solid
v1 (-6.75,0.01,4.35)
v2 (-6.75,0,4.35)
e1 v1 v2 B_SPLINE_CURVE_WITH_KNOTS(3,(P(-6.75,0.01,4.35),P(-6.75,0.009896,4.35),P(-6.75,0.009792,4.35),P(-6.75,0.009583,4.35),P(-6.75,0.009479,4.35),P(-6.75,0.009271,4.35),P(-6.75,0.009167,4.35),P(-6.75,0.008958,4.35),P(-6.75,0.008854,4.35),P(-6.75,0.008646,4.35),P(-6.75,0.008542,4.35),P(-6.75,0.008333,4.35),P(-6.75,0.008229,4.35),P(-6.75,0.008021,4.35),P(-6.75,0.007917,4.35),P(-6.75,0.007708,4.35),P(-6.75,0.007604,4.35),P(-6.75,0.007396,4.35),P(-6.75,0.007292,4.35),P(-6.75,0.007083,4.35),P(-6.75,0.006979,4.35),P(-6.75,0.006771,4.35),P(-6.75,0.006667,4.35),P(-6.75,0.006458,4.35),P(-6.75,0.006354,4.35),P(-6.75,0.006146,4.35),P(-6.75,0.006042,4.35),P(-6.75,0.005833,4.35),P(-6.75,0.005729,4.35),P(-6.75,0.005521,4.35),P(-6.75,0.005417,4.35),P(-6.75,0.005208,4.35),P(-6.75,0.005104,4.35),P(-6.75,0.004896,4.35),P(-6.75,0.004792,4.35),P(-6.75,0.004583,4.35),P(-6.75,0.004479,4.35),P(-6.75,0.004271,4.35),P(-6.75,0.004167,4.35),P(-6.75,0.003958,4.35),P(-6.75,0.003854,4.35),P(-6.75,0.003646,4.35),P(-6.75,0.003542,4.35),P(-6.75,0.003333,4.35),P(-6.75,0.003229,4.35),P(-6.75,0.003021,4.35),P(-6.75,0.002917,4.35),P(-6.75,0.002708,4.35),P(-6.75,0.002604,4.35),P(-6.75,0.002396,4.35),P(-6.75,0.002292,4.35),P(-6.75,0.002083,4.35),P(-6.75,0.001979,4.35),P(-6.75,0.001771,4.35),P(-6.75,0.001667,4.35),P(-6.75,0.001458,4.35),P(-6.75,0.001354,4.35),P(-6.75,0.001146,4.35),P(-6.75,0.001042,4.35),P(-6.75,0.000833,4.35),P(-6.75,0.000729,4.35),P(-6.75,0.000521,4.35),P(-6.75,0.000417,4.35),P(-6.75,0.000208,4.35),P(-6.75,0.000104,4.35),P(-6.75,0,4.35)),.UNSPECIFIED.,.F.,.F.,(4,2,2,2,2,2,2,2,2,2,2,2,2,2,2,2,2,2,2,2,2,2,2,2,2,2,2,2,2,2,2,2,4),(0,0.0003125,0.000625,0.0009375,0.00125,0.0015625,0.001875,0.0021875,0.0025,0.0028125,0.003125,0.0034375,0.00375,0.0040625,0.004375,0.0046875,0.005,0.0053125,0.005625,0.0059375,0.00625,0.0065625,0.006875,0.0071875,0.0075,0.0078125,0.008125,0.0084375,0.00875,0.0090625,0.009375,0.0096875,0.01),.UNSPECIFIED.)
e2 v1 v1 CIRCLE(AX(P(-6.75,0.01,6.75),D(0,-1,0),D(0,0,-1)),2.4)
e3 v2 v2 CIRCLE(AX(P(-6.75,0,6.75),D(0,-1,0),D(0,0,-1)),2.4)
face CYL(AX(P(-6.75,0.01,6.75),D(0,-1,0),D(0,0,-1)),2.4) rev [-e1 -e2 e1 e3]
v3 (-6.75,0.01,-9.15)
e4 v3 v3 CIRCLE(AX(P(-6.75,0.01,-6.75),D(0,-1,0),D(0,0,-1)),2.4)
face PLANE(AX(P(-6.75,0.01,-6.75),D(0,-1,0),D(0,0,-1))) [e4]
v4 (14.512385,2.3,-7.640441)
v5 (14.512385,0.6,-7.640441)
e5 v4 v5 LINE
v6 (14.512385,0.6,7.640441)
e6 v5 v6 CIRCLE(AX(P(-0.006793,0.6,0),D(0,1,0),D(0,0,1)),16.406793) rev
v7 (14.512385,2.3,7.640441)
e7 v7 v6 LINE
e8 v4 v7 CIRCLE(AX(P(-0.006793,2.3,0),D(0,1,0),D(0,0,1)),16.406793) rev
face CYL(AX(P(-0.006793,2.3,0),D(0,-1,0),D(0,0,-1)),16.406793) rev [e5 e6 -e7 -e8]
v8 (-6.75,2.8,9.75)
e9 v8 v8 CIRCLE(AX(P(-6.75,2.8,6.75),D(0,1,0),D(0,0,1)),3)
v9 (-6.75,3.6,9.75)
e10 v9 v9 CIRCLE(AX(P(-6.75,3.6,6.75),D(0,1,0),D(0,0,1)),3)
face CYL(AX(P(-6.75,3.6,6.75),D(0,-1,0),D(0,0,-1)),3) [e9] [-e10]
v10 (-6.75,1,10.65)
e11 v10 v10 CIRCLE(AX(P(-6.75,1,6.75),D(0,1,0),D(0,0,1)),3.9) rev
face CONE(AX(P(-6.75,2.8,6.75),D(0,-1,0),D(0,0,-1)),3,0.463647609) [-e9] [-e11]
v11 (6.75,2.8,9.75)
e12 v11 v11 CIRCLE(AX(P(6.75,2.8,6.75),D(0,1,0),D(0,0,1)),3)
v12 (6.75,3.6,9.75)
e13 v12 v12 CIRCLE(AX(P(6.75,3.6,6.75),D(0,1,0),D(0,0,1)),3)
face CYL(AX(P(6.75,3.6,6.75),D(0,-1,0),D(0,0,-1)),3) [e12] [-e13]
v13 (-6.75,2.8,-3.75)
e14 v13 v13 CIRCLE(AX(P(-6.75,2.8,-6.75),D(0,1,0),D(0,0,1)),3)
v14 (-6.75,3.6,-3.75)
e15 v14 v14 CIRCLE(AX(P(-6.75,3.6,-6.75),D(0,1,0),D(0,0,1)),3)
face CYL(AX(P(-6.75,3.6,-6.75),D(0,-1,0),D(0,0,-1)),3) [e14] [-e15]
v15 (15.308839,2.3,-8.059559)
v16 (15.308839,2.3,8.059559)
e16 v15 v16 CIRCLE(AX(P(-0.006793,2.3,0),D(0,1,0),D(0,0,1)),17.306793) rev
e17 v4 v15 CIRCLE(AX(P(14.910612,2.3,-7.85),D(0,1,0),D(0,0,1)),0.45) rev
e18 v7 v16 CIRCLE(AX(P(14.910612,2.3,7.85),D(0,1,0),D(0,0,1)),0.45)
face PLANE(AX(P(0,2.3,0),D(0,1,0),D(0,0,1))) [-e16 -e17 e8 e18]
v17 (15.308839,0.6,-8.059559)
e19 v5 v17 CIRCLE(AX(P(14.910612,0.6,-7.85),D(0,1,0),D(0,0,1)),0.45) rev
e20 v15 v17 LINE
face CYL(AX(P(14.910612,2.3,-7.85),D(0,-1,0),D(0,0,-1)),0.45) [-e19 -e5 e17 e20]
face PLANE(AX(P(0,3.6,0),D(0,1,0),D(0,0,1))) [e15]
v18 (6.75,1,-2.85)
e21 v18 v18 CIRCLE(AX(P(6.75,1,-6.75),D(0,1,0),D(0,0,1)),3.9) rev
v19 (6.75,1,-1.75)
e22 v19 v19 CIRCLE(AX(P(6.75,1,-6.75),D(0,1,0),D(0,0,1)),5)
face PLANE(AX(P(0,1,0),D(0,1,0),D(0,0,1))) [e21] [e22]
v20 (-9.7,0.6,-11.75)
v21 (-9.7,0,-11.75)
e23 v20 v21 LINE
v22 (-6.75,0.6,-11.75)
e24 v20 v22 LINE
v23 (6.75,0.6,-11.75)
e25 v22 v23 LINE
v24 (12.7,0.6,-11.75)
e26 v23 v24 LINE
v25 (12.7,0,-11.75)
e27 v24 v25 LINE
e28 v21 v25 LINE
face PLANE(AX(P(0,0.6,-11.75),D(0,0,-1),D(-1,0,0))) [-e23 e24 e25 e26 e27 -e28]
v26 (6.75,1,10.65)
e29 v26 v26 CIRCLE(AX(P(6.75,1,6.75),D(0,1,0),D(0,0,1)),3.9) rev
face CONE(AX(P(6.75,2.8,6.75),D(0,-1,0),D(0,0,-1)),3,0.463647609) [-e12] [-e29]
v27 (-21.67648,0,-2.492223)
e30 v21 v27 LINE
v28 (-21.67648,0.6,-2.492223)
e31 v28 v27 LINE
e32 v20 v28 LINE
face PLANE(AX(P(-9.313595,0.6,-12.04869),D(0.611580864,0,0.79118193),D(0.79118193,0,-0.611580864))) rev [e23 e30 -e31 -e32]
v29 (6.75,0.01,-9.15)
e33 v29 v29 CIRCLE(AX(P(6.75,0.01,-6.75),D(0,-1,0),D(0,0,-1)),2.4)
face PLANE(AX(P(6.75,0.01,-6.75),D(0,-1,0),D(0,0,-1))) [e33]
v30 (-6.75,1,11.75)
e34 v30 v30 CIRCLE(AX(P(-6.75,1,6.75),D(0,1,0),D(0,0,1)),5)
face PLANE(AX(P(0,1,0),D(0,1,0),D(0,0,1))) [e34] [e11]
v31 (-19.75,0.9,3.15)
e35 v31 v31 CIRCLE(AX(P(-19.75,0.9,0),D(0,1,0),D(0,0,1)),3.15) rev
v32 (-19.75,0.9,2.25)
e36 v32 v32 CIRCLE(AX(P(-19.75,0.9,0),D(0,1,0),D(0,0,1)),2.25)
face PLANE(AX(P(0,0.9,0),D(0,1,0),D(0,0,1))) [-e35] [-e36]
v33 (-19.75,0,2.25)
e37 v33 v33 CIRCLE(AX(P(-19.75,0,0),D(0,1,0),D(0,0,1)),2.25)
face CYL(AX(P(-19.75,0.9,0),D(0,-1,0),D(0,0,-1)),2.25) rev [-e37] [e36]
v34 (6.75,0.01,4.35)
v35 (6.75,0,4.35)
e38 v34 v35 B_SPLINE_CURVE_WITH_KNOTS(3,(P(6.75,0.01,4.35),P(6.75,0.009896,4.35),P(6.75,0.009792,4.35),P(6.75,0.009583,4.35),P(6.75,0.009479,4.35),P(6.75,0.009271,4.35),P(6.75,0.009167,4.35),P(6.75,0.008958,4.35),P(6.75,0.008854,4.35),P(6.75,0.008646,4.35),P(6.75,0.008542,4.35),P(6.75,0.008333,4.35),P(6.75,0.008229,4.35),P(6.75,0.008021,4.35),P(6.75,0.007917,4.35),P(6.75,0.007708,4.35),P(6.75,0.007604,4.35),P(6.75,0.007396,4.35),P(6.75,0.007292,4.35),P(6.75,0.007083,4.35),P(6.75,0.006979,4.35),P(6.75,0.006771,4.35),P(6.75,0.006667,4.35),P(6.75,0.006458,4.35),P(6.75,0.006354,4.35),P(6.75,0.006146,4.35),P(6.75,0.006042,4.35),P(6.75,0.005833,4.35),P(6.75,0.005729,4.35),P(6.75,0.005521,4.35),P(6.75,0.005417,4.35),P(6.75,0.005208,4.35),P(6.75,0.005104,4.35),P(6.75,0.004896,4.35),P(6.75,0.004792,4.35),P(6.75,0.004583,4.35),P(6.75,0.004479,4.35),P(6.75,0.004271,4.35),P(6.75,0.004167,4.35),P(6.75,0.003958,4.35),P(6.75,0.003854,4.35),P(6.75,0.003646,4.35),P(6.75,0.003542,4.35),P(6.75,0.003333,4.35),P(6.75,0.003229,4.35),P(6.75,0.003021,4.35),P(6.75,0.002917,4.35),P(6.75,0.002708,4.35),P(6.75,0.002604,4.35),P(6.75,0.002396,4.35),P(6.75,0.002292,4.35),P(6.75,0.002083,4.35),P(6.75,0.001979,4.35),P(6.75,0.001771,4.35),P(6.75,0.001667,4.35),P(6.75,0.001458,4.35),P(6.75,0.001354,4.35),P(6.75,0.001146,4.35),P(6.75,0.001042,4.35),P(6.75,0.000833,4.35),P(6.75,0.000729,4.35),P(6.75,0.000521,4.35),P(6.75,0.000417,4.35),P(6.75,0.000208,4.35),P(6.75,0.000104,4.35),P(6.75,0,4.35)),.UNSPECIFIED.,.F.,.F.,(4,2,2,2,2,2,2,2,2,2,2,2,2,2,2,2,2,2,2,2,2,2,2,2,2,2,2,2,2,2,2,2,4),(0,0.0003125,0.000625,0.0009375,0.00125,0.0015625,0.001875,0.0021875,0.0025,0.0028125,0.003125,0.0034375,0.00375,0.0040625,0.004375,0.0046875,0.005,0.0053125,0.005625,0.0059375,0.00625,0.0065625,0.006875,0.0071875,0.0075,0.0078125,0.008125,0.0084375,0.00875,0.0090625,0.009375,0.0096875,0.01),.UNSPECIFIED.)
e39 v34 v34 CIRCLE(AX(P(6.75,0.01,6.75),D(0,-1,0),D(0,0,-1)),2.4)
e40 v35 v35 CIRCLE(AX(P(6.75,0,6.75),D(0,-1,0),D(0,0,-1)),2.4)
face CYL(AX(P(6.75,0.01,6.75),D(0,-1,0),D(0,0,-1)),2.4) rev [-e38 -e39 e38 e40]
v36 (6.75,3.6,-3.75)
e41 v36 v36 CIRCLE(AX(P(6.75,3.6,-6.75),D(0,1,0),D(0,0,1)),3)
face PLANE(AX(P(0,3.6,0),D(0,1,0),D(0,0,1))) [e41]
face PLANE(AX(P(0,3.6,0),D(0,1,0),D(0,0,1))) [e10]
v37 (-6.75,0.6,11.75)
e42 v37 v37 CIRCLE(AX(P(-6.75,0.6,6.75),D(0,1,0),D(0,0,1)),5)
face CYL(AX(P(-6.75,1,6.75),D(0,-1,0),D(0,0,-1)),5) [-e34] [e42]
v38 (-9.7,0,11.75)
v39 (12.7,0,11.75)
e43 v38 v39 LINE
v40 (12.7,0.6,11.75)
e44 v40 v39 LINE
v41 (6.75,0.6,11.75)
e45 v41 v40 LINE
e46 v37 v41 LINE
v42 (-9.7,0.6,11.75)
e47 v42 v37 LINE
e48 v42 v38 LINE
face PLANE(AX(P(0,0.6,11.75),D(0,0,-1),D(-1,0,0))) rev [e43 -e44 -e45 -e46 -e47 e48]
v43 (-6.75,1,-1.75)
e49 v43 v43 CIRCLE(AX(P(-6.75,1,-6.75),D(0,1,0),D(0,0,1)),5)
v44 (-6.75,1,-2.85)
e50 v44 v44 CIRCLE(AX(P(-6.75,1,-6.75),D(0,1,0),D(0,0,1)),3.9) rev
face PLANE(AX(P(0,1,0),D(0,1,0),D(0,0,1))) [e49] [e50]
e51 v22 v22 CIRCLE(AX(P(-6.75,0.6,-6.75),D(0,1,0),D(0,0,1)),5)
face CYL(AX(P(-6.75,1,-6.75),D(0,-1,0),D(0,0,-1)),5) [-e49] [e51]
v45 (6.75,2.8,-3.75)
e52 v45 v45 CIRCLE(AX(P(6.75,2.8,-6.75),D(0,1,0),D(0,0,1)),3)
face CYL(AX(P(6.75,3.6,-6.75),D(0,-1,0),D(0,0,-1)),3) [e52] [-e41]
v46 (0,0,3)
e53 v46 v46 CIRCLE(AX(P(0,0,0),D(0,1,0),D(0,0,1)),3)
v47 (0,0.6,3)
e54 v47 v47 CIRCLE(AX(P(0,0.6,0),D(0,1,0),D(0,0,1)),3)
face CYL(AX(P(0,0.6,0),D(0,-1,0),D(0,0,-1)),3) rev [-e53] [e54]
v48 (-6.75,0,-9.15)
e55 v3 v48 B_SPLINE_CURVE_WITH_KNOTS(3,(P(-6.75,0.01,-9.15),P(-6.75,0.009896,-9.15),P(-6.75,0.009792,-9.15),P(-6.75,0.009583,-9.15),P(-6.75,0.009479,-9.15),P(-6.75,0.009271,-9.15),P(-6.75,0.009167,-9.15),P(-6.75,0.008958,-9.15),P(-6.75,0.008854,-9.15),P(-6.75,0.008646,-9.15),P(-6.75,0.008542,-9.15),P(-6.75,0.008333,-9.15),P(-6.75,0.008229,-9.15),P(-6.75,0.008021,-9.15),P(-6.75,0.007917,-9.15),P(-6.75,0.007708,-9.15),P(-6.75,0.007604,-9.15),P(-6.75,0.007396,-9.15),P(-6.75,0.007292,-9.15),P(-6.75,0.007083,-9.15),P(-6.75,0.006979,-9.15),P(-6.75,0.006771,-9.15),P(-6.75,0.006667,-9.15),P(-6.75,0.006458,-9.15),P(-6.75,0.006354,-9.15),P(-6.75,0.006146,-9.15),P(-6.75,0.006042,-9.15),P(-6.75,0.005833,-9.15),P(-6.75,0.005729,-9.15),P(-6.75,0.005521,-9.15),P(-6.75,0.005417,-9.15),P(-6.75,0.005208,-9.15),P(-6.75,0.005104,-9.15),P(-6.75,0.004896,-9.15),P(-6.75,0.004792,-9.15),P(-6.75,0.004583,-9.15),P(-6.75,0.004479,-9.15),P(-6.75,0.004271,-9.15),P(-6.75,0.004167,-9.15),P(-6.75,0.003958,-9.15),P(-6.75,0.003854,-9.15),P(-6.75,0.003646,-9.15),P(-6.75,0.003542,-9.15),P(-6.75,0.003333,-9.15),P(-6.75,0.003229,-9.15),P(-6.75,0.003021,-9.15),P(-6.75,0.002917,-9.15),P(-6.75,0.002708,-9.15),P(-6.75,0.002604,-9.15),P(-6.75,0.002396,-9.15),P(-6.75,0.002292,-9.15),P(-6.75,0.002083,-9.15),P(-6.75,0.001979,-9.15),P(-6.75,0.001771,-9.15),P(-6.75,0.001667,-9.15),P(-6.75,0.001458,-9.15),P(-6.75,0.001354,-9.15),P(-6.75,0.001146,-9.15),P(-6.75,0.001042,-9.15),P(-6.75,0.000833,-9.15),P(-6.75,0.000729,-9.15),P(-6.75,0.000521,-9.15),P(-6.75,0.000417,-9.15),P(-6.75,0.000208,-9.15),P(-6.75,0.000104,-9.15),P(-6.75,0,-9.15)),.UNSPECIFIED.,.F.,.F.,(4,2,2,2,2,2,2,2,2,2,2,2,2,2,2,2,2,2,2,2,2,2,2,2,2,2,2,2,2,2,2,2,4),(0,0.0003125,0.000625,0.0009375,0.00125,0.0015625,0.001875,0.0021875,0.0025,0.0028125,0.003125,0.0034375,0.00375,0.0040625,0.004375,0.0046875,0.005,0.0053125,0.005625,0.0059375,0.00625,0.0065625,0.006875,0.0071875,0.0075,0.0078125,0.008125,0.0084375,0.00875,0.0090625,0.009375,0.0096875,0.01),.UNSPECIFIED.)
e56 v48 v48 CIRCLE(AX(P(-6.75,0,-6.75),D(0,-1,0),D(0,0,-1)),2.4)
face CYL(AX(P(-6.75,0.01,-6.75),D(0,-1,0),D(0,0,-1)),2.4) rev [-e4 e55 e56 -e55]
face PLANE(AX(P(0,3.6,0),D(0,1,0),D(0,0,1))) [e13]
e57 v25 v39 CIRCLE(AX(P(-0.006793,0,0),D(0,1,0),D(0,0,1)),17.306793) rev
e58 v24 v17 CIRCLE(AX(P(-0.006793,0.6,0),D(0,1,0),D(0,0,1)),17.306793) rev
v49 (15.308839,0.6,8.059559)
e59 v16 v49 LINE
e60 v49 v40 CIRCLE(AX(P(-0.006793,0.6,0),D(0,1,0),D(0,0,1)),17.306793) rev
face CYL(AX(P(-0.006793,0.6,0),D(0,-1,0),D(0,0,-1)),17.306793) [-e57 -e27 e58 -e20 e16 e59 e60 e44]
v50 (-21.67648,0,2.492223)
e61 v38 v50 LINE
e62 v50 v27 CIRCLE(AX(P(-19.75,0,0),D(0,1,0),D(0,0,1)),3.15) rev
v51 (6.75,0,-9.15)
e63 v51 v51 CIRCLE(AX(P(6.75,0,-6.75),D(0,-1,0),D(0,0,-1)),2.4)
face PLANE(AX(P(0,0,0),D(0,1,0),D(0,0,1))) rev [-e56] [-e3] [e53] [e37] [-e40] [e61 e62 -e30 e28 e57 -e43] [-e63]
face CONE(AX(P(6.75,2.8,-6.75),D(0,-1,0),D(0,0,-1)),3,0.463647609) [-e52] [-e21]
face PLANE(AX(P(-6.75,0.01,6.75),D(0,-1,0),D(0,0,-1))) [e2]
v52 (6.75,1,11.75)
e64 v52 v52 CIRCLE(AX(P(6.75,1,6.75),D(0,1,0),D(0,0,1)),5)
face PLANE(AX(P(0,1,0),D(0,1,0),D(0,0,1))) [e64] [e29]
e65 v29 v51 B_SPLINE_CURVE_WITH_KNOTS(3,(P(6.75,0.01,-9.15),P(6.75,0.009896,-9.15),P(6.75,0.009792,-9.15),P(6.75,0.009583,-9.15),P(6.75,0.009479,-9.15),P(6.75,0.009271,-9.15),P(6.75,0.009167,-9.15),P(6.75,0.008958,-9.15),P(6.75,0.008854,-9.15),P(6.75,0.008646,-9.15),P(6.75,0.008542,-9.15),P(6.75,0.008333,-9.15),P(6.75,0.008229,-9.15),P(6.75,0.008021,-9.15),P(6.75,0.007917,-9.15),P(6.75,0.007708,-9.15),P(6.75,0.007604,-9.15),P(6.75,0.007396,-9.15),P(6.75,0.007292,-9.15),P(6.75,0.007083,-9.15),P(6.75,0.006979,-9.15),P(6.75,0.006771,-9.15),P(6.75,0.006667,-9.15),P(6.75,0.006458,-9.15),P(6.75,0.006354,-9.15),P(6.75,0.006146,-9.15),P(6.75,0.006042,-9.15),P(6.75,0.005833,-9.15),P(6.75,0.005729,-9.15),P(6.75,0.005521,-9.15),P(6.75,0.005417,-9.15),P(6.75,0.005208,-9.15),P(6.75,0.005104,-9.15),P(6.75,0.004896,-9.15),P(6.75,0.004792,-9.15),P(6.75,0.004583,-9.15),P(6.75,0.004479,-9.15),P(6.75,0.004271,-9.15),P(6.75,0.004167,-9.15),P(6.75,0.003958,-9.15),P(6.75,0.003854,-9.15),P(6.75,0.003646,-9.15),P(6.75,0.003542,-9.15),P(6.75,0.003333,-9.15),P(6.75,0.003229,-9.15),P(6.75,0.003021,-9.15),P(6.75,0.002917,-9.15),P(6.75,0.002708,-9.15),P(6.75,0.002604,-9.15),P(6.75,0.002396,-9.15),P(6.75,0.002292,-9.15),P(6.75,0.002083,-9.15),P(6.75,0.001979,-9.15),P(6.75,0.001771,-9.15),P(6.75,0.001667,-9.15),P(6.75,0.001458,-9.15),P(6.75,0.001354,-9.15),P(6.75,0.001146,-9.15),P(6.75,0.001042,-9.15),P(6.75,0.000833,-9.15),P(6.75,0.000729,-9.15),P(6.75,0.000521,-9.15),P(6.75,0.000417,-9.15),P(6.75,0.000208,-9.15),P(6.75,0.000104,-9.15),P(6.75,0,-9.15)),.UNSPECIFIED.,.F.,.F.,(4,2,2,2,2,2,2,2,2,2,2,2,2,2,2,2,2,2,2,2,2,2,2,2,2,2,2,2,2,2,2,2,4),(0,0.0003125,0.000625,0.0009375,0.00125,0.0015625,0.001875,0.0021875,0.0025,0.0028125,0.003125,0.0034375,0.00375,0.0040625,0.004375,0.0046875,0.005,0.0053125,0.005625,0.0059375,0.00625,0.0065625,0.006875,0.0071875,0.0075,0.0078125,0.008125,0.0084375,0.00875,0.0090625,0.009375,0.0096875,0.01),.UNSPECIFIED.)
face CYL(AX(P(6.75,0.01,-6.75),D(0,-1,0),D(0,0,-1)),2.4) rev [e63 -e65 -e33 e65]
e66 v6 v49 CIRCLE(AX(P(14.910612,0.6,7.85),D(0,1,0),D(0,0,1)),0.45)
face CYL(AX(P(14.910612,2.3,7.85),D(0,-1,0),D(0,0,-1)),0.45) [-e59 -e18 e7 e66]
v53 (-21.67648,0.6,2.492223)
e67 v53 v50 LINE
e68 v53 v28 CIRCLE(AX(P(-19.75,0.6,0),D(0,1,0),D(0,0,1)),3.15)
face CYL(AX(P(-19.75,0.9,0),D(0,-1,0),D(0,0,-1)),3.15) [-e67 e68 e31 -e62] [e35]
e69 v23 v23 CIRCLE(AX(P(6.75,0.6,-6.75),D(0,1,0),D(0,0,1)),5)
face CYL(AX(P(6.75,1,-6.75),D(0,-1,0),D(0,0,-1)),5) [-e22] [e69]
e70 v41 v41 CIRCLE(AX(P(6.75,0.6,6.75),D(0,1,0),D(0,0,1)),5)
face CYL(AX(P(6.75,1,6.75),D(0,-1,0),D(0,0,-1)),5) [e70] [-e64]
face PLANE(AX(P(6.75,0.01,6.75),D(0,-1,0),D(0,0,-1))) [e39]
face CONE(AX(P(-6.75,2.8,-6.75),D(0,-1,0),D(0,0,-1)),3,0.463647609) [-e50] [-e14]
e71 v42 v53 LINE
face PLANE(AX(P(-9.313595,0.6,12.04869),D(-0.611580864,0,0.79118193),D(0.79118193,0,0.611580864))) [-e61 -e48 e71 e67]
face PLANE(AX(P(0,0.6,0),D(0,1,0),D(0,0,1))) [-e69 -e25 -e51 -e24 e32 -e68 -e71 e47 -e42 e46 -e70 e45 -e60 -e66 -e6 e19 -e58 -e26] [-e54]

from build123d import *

# Parameters (mm, degrees)
ESQUISSE1_R             = 3
SUPPORT_DEPTH           = 0.6
ESQUISSE1_4_R           = 2.25
FIXATION_DEPTH          = 0.9
LANGUETTE_DEPTH         = 2.3
ESQUISSE2_R             = 5
ESQUISSE2_R_2           = 4
SEMELLE_DEPTH           = 0.4
ESQUISSE2_4_R           = 3
BOUTONS_DEPTH           = 3
ESQUISSE2_5_R           = 4
ESQUISSE2_5_R_2         = 3
BORDURE_DEPTH           = 2.2
CHANFREIN_SIZE          = 2
CHANFREIN_SIZE_2        = 1
ESQUISSE3_R             = 2.4
ENL_V_MAT_EXTRU_1_DEPTH = 0.01


with BuildPart() as part:
    # Esquisse1 → Support (new body)
    with BuildSketch(Plane(origin=(0, 0, 0), x_dir=(1, 0, 0), z_dir=(0, 1, 0))):
        with BuildLine():
            Line((12.7, 11.75), (-9.7, 11.75))
            Line((-9.7, 11.75), (-21.676479721, 2.492223081))
            ThreePointArc((-21.676479721, 2.492223081), (-18.361819738, 2.82762366), (-16.6, 0))
            ThreePointArc((-16.6, 0), (-18.361819738, -2.82762366), (-21.676479721, -2.492223081))
            Line((-21.676479721, -2.492223081), (-9.7, -11.75))
            Line((-9.7, -11.75), (12.7, -11.75))
            ThreePointArc((12.7, -11.75), (14.125401288, -9.990303879), (15.308839134, -8.059559428))
            ThreePointArc((15.308839134, -8.059559428), (14.701052578, -8.248227129), (14.512384877, -7.640440572))
            ThreePointArc((14.512384877, -7.640440572), (16.4, 0), (14.512384877, 7.640440572))
            ThreePointArc((14.512384877, 7.640440572), (14.701052578, 8.248227129), (15.308839134, 8.059559428))
            ThreePointArc((15.308839134, 8.059559428), (14.125401288, 9.990303879), (12.7, 11.75))
        make_face()
        with Locations(Location((0, 0, 0), (0, 0, 270))):
            Circle(ESQUISSE1_R, mode=Mode.SUBTRACT)
    extrude(amount=SUPPORT_DEPTH)

    # Esquisse1<4> → Fixation (add)
    with BuildSketch(Plane(origin=(0, 0, 0), x_dir=(1, 0, 0), z_dir=(0, 1, 0))):
        with BuildLine():
            ThreePointArc((-16.6, 0), (-18.361819738, 2.82762366), (-21.676479721, 2.492223081))
            ThreePointArc((-21.676479721, 2.492223081), (-22.9, 0), (-21.676479721, -2.492223081))
            ThreePointArc((-21.676479721, -2.492223081), (-18.361819738, -2.82762366), (-16.6, 0))
        make_face()
        with Locations(Location((-19.75, 0, 0), (0, 0, 270))):
            Circle(ESQUISSE1_4_R, mode=Mode.SUBTRACT)
    extrude(amount=FIXATION_DEPTH)

    # Esquisse1<5> → Languette (add)
    with BuildSketch(Plane(origin=(0, 0, 0), x_dir=(1, 0, 0), z_dir=(0, 1, 0))):
        with BuildLine():
            ThreePointArc((15.308839134, -8.059559428), (17.3, 0), (15.308839134, 8.059559428))
            ThreePointArc((15.308839134, 8.059559428), (14.701052578, 8.248227129), (14.512384877, 7.640440572))
            ThreePointArc((14.512384877, 7.640440572), (16.4, 0), (14.512384877, -7.640440572))
            ThreePointArc((14.512384877, -7.640440572), (14.701052578, -8.248227129), (15.308839134, -8.059559428))
        make_face()
    extrude(amount=LANGUETTE_DEPTH)

    # Esquisse2 → Semelle (add)
    # profile 1 of 4: a face of its own
    with BuildSketch(Plane(origin=(0, 0.6, 0), x_dir=(1, 0, 0), z_dir=(0, 1, 0))):
        with Locations(Location((-6.75, 6.75, 0), (0, 0, 90))):
            Circle(ESQUISSE2_R)
        with Locations(Location((-6.75, 6.75, 0), (0, 0, 270))):
            Circle(ESQUISSE2_R_2, mode=Mode.SUBTRACT)
    # profile 2 of 4: a face of its own
    with BuildSketch(Plane(origin=(0, 0.6, 0), x_dir=(1, 0, 0), z_dir=(0, 1, 0))):
        with Locations(Location((6.75, 6.75, 0), (0, 0, 90))):
            Circle(ESQUISSE2_R)
        with Locations(Location((6.75, 6.75, 0), (0, 0, 270))):
            Circle(ESQUISSE2_R_2, mode=Mode.SUBTRACT)
    # profile 3 of 4: a face of its own
    with BuildSketch(Plane(origin=(0, 0.6, 0), x_dir=(1, 0, 0), z_dir=(0, 1, 0))):
        with Locations(Location((6.75, -6.75, 0), (0, 0, 270))):
            Circle(ESQUISSE2_R)
        with Locations(Location((6.75, -6.75, 0), (0, 0, 270))):
            Circle(ESQUISSE2_R_2, mode=Mode.SUBTRACT)
    # profile 4 of 4: a face of its own
    with BuildSketch(Plane(origin=(0, 0.6, 0), x_dir=(1, 0, 0), z_dir=(0, 1, 0))):
        with Locations(Location((-6.75, -6.75, 0), (0, 0, 270))):
            Circle(ESQUISSE2_R)
        with Locations(Location((-6.75, -6.75, 0), (0, 0, 270))):
            Circle(ESQUISSE2_R_2, mode=Mode.SUBTRACT)
    extrude(amount=SEMELLE_DEPTH)

    # Esquisse2<4> → Boutons (add)
    with BuildSketch(Plane(origin=(0, 0.6, 0), x_dir=(1, 0, 0), z_dir=(0, 1, 0))):
        with Locations(Location((-6.75, 6.75, 0), (0, 0, 270))):
            Circle(ESQUISSE2_4_R)
        with Locations(Location((6.75, 6.75, 0), (0, 0, 270))):
            Circle(ESQUISSE2_4_R)
        with Locations(Location((6.75, -6.75, 0), (0, 0, 270))):
            Circle(ESQUISSE2_4_R)
        with Locations(Location((-6.75, -6.75, 0), (0, 0, 270))):
            Circle(ESQUISSE2_4_R)
    extrude(amount=BOUTONS_DEPTH)

    # Esquisse2<5> → Bordure (add)
    # profile 1 of 4: a face of its own
    with BuildSketch(Plane(origin=(0, 0.6, 0), x_dir=(1, 0, 0), z_dir=(0, 1, 0))):
        with Locations(Location((-6.75, 6.75, 0), (0, 0, 270))):
            Circle(ESQUISSE2_5_R)
        with Locations(Location((-6.75, 6.75, 0), (0, 0, 270))):
            Circle(ESQUISSE2_5_R_2, mode=Mode.SUBTRACT)
    # profile 2 of 4: a face of its own
    with BuildSketch(Plane(origin=(0, 0.6, 0), x_dir=(1, 0, 0), z_dir=(0, 1, 0))):
        with Locations(Location((6.75, 6.75, 0), (0, 0, 270))):
            Circle(ESQUISSE2_5_R)
        with Locations(Location((6.75, 6.75, 0), (0, 0, 270))):
            Circle(ESQUISSE2_5_R_2, mode=Mode.SUBTRACT)
    # profile 3 of 4: a face of its own
    with BuildSketch(Plane(origin=(0, 0.6, 0), x_dir=(1, 0, 0), z_dir=(0, 1, 0))):
        with Locations(Location((-6.75, -6.75, 0), (0, 0, 270))):
            Circle(ESQUISSE2_5_R)
        with Locations(Location((-6.75, -6.75, 0), (0, 0, 270))):
            Circle(ESQUISSE2_5_R_2, mode=Mode.SUBTRACT)
    # profile 4 of 4: a face of its own
    with BuildSketch(Plane(origin=(0, 0.6, 0), x_dir=(1, 0, 0), z_dir=(0, 1, 0))):
        with Locations(Location((6.75, -6.75, 0), (0, 0, 270))):
            Circle(ESQUISSE2_5_R)
        with Locations(Location((6.75, -6.75, 0), (0, 0, 270))):
            Circle(ESQUISSE2_5_R_2, mode=Mode.SUBTRACT)
    extrude(amount=BORDURE_DEPTH)

    # Chanfrein
    # the kernel refuses this chamfer: 2, 1 mm, written as the material it takes off along each edge
    with BuildSketch(Plane(origin=(6.75, 2.8, -6.75), x_dir=(0, 0, 1), z_dir=(-1, 0, 0))) as chanfrein_piece_1_section:
        Polygon((4, -CHANFREIN_SIZE), (4 - CHANFREIN_SIZE_2, 0), (4, 0), align=None)
    chanfrein_piece_1 = revolve(axis=Axis((6.75, 2.8, -6.75), (0, 1, 0)), mode=Mode.PRIVATE)
    chanfrein_piece_1 = split(chanfrein_piece_1, bisect_by=Plane(origin=(6.75, 1, -10.226430856), z_dir=(0, 1, 0)), keep=Keep.TOP, mode=Mode.PRIVATE)
    chanfrein_piece_1 = chanfrein_piece_1 - Plane(origin=(6.75, 1.913215428, -6.75), x_dir=(0, 0, 1), z_dir=(0, -1, 0)) * Cylinder(3, 16, mode=Mode.PRIVATE)
    add(chanfrein_piece_1, mode=Mode.SUBTRACT)
    with BuildSketch(Plane(origin=(6.75, 2.8, 6.75), x_dir=(0, 0, 1), z_dir=(-1, 0, 0))) as chanfrein_piece_2_section:
        Polygon((4, -CHANFREIN_SIZE), (4 - CHANFREIN_SIZE_2, 0), (4, 0), align=None)
    chanfrein_piece_2 = revolve(axis=Axis((6.75, 2.8, 6.75), (0, 1, 0)), mode=Mode.PRIVATE)
    chanfrein_piece_2 = split(chanfrein_piece_2, bisect_by=Plane(origin=(6.75, 1, 3.273569144), z_dir=(0, 1, 0)), keep=Keep.TOP, mode=Mode.PRIVATE)
    chanfrein_piece_2 = chanfrein_piece_2 - Plane(origin=(6.75, 1.913215428, 6.75), x_dir=(0, 0, 1), z_dir=(0, -1, 0)) * Cylinder(3, 16, mode=Mode.PRIVATE)
    add(chanfrein_piece_2, mode=Mode.SUBTRACT)
    with BuildSketch(Plane(origin=(-6.75, 2.8, 6.75), x_dir=(0, 0, 1), z_dir=(-1, 0, 0))) as chanfrein_piece_3_section:
        Polygon((4, -CHANFREIN_SIZE), (4 - CHANFREIN_SIZE_2, 0), (4, 0), align=None)
    chanfrein_piece_3 = revolve(axis=Axis((-6.75, 2.8, 6.75), (0, 1, 0)), mode=Mode.PRIVATE)
    chanfrein_piece_3 = split(chanfrein_piece_3, bisect_by=Plane(origin=(-6.75, 1, 3.273569144), z_dir=(0, 1, 0)), keep=Keep.TOP, mode=Mode.PRIVATE)
    chanfrein_piece_3 = chanfrein_piece_3 - Plane(origin=(-6.75, 1.913215428, 6.75), x_dir=(0, 0, 1), z_dir=(0, -1, 0)) * Cylinder(3, 16, mode=Mode.PRIVATE)
    add(chanfrein_piece_3, mode=Mode.SUBTRACT)
    with BuildSketch(Plane(origin=(-6.75, 2.8, -6.75), x_dir=(0, 0, 1), z_dir=(-1, 0, 0))) as chanfrein_piece_4_section:
        Polygon((4, -CHANFREIN_SIZE), (4 - CHANFREIN_SIZE_2, 0), (4, 0), align=None)
    chanfrein_piece_4 = revolve(axis=Axis((-6.75, 2.8, -6.75), (0, 1, 0)), mode=Mode.PRIVATE)
    chanfrein_piece_4 = split(chanfrein_piece_4, bisect_by=Plane(origin=(-6.75, 1, -10.226430856), z_dir=(0, 1, 0)), keep=Keep.TOP, mode=Mode.PRIVATE)
    chanfrein_piece_4 = chanfrein_piece_4 - Plane(origin=(-6.75, 1.913215428, -6.75), x_dir=(0, 0, 1), z_dir=(0, -1, 0)) * Cylinder(3, 16, mode=Mode.PRIVATE)
    add(chanfrein_piece_4, mode=Mode.SUBTRACT)

    # Esquisse3 → Enlèv. mat.-Extru.1 (cut)
    with BuildSketch(Plane.XZ):
        with Locations(Location((6.75, -6.75, 0), (0, 0, 270))):
            Circle(ESQUISSE3_R)
        with Locations(Location((-6.75, -6.75, 0), (0, 0, 270))):
            Circle(ESQUISSE3_R)
        with Locations(Location((6.75, 6.75, 0), (0, 0, 270))):
            Circle(ESQUISSE3_R)
        with Locations(Location((-6.75, 6.75, 0), (0, 0, 270))):
            Circle(ESQUISSE3_R)
    extrude(amount=-ENL_V_MAT_EXTRU_1_DEPTH, mode=Mode.SUBTRACT)


solid = part.part
